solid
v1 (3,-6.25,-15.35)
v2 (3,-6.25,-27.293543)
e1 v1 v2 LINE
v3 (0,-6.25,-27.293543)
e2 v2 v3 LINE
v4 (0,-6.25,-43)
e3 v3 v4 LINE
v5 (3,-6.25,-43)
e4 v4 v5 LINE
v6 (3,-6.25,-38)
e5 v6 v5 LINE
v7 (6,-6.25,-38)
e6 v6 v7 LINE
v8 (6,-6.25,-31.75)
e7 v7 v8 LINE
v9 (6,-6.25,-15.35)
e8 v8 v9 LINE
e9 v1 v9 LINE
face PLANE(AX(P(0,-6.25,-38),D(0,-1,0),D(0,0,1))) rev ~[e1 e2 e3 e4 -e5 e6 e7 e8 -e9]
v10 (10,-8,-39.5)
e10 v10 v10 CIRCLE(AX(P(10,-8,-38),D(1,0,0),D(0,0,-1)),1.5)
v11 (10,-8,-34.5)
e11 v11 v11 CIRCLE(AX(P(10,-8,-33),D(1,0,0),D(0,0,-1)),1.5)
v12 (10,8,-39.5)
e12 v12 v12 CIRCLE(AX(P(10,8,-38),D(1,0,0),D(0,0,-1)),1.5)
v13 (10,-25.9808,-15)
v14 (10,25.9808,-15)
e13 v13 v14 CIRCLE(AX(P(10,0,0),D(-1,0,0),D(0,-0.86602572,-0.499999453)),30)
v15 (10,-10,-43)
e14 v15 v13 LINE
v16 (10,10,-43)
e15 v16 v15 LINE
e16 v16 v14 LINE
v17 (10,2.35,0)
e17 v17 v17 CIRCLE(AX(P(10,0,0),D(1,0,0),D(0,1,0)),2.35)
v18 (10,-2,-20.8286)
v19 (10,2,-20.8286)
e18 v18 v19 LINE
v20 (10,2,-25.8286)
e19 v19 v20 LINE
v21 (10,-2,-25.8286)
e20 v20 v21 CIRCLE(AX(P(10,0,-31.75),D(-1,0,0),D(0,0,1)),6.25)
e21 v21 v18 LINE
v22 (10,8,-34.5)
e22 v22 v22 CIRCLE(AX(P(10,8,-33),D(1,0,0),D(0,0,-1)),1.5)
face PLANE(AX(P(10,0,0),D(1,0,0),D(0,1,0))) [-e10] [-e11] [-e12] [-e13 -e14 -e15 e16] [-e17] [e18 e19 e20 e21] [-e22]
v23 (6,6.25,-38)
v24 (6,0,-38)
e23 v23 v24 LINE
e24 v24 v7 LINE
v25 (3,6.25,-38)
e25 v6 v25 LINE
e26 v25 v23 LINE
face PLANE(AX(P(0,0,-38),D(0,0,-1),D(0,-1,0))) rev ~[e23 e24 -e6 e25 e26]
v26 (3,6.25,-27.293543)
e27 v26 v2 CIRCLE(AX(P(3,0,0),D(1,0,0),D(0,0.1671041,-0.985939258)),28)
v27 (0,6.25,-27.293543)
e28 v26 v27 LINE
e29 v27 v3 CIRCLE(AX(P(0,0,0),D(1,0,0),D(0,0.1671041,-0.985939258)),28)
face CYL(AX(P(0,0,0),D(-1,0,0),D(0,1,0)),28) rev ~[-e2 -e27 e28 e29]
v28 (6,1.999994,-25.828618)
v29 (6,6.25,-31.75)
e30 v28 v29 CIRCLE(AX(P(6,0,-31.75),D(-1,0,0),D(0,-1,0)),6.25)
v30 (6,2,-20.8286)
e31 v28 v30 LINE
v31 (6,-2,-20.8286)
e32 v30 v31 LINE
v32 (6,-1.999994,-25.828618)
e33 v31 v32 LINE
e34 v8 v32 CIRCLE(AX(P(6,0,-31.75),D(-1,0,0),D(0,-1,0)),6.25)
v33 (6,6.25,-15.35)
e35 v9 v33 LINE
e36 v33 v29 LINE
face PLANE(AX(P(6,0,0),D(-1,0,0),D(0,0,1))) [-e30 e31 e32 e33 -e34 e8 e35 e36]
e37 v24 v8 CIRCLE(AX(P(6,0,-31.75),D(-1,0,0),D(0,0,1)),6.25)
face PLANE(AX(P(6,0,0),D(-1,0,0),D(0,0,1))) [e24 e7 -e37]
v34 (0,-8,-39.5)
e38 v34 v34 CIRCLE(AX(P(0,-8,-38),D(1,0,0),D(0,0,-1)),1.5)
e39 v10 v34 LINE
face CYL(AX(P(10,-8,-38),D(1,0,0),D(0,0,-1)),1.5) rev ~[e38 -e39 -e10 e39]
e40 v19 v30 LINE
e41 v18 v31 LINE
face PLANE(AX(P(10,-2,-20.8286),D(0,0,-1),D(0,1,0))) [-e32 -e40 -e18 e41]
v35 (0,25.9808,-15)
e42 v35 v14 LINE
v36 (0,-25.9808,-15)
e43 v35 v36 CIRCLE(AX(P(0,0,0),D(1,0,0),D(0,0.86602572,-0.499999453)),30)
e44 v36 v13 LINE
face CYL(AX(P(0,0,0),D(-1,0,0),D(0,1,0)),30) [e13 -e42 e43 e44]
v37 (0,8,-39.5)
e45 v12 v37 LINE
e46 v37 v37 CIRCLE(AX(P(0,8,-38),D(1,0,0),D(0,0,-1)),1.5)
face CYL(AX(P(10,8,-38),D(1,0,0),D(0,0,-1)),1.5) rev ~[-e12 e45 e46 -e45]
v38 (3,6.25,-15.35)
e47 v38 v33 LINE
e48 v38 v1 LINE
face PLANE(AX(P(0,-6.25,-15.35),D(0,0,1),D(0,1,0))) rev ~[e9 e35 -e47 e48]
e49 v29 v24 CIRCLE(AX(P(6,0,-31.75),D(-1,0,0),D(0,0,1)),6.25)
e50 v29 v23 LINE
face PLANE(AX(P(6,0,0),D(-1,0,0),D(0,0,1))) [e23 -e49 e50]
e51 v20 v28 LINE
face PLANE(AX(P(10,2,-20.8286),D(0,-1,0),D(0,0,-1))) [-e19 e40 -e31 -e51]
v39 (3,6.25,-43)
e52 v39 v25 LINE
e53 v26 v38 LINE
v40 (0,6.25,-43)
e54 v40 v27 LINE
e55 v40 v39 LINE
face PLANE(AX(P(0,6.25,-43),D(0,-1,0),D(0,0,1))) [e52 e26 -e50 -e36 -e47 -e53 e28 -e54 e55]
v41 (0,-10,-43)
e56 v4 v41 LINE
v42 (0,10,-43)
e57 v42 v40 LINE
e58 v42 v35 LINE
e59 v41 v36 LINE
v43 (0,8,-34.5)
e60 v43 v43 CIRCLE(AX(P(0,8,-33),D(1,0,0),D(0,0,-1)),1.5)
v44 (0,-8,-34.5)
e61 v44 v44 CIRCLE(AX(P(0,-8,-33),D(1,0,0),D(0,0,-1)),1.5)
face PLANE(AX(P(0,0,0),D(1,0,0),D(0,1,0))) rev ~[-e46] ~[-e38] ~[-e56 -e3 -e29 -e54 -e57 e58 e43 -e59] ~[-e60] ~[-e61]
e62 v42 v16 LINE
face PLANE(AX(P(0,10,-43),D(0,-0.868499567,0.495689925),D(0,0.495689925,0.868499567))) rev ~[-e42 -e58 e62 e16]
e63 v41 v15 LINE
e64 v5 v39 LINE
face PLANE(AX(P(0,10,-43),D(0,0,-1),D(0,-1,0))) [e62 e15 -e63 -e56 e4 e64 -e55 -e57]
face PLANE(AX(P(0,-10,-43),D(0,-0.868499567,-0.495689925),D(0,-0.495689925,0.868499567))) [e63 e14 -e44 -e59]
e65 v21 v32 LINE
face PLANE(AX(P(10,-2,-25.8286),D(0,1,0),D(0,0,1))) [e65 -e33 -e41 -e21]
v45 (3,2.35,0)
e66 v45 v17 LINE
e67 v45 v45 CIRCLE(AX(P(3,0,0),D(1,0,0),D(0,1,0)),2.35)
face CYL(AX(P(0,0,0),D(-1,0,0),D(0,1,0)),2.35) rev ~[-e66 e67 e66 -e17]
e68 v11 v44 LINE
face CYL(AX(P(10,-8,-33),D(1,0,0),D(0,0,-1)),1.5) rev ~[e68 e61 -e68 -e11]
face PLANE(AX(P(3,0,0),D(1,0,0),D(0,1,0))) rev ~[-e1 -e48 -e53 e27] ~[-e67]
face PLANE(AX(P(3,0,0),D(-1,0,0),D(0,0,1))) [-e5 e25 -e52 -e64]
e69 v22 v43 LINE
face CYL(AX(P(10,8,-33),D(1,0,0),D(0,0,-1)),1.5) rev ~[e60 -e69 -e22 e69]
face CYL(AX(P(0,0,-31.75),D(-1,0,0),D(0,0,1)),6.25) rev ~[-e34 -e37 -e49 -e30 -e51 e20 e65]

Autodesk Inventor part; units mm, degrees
ref_plane "YZ Plane" through (0, 0, 0) normal (1, 0, 0) x (0, 1, 0)
ref_plane "XZ Plane" through (0, 0, 0) normal (0, 1, 0) x (-1, 0, 0)
ref_plane "XY Plane" through (0, 0, 0) normal (0, 0, 1) x (1, 0, 0)
sketch "スケッチ1" plane through (0, 0, 0) normal (1, 0, 0) x (0, 1, 0)
  circle A0 centre (0, 0) radius 30
  line L0 (10, -28.2843) -> (10, -43)
  line L1 (10, -43) -> (-10, -43)
  line L2 (-10, -43) -> (-10, -28.2843)
  line L3 (10, -43) -> (25.9808, -15)
  line L4 (-10, -43) -> (-25.9808, -15)
  circle A1 centre (0, 0) radius 2.35
  circle A2 centre (0, 0) radius 28
  point P0 (0, -30)
  point P1 (0, -28.05)
  point P2 (0, -26.4333)
  dimension "d2" = 20
  dimension "d10" = 4.7
  dimension "d34" = 13
  dimension "d39" = 2
extrude "押し出し8" add sketch "スケッチ1" along normal blind 10 contours A0 | A0 L2 L4 | L3 L0 A0 | A0 L0 L1 L2 | A2
extrude "押し出し9" cut sketch "スケッチ1" along normal blind 3 contours A2
sketch "スケッチ3" plane through (0, 0, 0) normal (-1, 0, 0) x (0, 0, 1)
  line L0 (-15.35, 6.25) -> (-38, 6.25)
  line L1 (-38, 6.25) -> (-38, -6.25)
  line L2 (-38, -6.25) -> (-15.35, -6.25)
  line L3 (-15.35, -6.25) -> (-15.35, 6.25)
  line L4 (-15.35, 6.25) -> (-38, -6.25) construction
  line L5 (-38, 6.25) -> (-15.35, -6.25) construction
  line L6 (-15.35, -6.25) -> (-10.35, -6.25)
  line L7 (-10.35, -6.25) -> (-10.35, 6.25)
  line L8 (-10.35, 6.25) -> (-15.35, 6.25)
  line L9 (-15.35, 6.25) -> (-15.35, -6.25)
  line L10 (-38, -6.25) -> (-43, -6.25)
  line L11 (-43, -6.25) -> (-43, 6.25)
  line L12 (-43, 6.25) -> (-38, 6.25)
  line L13 (-38, 6.25) -> (-38, -6.25)
  circle A0 centre (-31.75, 0) radius 6.25
  circle A1 centre (-31.75, 0) radius 2.4
  line L14 (-43, -10) -> (-43, 10) projected
  point P0 (0, 0)
  point P1 (-26.675, 0)
  dimension "d42" = 22.65
  dimension "d43" = 12.5
  dimension "d44" = 5
  dimension "d45" = 5
  dimension "d46" = 12.5
  dimension "d47" = 0
  dimension "d48" = 4.8
  dimension "d49" = 0
  dimension "d50" = 0
extrude "押し出し10" cut sketch "スケッチ3" against normal blind 10 contours A0
extrude "押し出し11" cut sketch "スケッチ3" against normal blind 10 contours A1
extrude "押し出し12" cut sketch "スケッチ3" against normal blind 6 contours L3 L2 A0 L0 | A0 L1 L0 | A0 L2 L1
extrude "押し出し13" cut sketch "スケッチ3" against normal blind 3 contours L1 L10 L11 L12
sketch "スケッチ5" plane through (10, 0, 0) normal (1, 0, 0) x (0, 0, -1)
  arc A0 (31.75, 6.25) -> (31.75, -6.25) centre (31.75, 0) ccw projected
  line L0 (25.8286, -2) -> (20.8286, -2)
  line L1 (20.8286, -2) -> (20.8286, 2)
  line L2 (20.8286, 2) -> (25.8286, 2)
  line L3 (25.8286, 2) -> (25.8286, -2)
  point P0 (0, 0)
  dimension "d63" = 4
  dimension "d64" = 2
  dimension "d65" = 5
extrude "押し出し14" cut sketch "スケッチ5" against normal blind 10
sketch "スケッチ6" plane through (10, 0, 0) normal (1, 0, 0) x (0, 0, -1)
  circle A0 centre (38, -8) radius 1.5
  circle A1 centre (38, 8) radius 1.5
  line L0 (43, -10) -> (43, 10) projected
  circle A2 centre (33, -8) radius 1.5
  circle A3 centre (33, 8) radius 1.5
  point P0 (0, 0)
  dimension "d68" = 5
  dimension "d69" = 5
  dimension "d74" = 3
  dimension "d76" = 16
  dimension "d77" = 2
  dimension "d78" = 2
  dimension "d81" = 3
  dimension "d82" = 5
  dimension "d83" = 5
  dimension "d84" = 3
extrude "押し出し15" cut sketch "スケッチ6" against normal blind 100 contours A0 | A1
extrude "押し出し16" cut sketch "スケッチ6" against normal blind 100 contours A2 | A3
properties part number "BasePart"
